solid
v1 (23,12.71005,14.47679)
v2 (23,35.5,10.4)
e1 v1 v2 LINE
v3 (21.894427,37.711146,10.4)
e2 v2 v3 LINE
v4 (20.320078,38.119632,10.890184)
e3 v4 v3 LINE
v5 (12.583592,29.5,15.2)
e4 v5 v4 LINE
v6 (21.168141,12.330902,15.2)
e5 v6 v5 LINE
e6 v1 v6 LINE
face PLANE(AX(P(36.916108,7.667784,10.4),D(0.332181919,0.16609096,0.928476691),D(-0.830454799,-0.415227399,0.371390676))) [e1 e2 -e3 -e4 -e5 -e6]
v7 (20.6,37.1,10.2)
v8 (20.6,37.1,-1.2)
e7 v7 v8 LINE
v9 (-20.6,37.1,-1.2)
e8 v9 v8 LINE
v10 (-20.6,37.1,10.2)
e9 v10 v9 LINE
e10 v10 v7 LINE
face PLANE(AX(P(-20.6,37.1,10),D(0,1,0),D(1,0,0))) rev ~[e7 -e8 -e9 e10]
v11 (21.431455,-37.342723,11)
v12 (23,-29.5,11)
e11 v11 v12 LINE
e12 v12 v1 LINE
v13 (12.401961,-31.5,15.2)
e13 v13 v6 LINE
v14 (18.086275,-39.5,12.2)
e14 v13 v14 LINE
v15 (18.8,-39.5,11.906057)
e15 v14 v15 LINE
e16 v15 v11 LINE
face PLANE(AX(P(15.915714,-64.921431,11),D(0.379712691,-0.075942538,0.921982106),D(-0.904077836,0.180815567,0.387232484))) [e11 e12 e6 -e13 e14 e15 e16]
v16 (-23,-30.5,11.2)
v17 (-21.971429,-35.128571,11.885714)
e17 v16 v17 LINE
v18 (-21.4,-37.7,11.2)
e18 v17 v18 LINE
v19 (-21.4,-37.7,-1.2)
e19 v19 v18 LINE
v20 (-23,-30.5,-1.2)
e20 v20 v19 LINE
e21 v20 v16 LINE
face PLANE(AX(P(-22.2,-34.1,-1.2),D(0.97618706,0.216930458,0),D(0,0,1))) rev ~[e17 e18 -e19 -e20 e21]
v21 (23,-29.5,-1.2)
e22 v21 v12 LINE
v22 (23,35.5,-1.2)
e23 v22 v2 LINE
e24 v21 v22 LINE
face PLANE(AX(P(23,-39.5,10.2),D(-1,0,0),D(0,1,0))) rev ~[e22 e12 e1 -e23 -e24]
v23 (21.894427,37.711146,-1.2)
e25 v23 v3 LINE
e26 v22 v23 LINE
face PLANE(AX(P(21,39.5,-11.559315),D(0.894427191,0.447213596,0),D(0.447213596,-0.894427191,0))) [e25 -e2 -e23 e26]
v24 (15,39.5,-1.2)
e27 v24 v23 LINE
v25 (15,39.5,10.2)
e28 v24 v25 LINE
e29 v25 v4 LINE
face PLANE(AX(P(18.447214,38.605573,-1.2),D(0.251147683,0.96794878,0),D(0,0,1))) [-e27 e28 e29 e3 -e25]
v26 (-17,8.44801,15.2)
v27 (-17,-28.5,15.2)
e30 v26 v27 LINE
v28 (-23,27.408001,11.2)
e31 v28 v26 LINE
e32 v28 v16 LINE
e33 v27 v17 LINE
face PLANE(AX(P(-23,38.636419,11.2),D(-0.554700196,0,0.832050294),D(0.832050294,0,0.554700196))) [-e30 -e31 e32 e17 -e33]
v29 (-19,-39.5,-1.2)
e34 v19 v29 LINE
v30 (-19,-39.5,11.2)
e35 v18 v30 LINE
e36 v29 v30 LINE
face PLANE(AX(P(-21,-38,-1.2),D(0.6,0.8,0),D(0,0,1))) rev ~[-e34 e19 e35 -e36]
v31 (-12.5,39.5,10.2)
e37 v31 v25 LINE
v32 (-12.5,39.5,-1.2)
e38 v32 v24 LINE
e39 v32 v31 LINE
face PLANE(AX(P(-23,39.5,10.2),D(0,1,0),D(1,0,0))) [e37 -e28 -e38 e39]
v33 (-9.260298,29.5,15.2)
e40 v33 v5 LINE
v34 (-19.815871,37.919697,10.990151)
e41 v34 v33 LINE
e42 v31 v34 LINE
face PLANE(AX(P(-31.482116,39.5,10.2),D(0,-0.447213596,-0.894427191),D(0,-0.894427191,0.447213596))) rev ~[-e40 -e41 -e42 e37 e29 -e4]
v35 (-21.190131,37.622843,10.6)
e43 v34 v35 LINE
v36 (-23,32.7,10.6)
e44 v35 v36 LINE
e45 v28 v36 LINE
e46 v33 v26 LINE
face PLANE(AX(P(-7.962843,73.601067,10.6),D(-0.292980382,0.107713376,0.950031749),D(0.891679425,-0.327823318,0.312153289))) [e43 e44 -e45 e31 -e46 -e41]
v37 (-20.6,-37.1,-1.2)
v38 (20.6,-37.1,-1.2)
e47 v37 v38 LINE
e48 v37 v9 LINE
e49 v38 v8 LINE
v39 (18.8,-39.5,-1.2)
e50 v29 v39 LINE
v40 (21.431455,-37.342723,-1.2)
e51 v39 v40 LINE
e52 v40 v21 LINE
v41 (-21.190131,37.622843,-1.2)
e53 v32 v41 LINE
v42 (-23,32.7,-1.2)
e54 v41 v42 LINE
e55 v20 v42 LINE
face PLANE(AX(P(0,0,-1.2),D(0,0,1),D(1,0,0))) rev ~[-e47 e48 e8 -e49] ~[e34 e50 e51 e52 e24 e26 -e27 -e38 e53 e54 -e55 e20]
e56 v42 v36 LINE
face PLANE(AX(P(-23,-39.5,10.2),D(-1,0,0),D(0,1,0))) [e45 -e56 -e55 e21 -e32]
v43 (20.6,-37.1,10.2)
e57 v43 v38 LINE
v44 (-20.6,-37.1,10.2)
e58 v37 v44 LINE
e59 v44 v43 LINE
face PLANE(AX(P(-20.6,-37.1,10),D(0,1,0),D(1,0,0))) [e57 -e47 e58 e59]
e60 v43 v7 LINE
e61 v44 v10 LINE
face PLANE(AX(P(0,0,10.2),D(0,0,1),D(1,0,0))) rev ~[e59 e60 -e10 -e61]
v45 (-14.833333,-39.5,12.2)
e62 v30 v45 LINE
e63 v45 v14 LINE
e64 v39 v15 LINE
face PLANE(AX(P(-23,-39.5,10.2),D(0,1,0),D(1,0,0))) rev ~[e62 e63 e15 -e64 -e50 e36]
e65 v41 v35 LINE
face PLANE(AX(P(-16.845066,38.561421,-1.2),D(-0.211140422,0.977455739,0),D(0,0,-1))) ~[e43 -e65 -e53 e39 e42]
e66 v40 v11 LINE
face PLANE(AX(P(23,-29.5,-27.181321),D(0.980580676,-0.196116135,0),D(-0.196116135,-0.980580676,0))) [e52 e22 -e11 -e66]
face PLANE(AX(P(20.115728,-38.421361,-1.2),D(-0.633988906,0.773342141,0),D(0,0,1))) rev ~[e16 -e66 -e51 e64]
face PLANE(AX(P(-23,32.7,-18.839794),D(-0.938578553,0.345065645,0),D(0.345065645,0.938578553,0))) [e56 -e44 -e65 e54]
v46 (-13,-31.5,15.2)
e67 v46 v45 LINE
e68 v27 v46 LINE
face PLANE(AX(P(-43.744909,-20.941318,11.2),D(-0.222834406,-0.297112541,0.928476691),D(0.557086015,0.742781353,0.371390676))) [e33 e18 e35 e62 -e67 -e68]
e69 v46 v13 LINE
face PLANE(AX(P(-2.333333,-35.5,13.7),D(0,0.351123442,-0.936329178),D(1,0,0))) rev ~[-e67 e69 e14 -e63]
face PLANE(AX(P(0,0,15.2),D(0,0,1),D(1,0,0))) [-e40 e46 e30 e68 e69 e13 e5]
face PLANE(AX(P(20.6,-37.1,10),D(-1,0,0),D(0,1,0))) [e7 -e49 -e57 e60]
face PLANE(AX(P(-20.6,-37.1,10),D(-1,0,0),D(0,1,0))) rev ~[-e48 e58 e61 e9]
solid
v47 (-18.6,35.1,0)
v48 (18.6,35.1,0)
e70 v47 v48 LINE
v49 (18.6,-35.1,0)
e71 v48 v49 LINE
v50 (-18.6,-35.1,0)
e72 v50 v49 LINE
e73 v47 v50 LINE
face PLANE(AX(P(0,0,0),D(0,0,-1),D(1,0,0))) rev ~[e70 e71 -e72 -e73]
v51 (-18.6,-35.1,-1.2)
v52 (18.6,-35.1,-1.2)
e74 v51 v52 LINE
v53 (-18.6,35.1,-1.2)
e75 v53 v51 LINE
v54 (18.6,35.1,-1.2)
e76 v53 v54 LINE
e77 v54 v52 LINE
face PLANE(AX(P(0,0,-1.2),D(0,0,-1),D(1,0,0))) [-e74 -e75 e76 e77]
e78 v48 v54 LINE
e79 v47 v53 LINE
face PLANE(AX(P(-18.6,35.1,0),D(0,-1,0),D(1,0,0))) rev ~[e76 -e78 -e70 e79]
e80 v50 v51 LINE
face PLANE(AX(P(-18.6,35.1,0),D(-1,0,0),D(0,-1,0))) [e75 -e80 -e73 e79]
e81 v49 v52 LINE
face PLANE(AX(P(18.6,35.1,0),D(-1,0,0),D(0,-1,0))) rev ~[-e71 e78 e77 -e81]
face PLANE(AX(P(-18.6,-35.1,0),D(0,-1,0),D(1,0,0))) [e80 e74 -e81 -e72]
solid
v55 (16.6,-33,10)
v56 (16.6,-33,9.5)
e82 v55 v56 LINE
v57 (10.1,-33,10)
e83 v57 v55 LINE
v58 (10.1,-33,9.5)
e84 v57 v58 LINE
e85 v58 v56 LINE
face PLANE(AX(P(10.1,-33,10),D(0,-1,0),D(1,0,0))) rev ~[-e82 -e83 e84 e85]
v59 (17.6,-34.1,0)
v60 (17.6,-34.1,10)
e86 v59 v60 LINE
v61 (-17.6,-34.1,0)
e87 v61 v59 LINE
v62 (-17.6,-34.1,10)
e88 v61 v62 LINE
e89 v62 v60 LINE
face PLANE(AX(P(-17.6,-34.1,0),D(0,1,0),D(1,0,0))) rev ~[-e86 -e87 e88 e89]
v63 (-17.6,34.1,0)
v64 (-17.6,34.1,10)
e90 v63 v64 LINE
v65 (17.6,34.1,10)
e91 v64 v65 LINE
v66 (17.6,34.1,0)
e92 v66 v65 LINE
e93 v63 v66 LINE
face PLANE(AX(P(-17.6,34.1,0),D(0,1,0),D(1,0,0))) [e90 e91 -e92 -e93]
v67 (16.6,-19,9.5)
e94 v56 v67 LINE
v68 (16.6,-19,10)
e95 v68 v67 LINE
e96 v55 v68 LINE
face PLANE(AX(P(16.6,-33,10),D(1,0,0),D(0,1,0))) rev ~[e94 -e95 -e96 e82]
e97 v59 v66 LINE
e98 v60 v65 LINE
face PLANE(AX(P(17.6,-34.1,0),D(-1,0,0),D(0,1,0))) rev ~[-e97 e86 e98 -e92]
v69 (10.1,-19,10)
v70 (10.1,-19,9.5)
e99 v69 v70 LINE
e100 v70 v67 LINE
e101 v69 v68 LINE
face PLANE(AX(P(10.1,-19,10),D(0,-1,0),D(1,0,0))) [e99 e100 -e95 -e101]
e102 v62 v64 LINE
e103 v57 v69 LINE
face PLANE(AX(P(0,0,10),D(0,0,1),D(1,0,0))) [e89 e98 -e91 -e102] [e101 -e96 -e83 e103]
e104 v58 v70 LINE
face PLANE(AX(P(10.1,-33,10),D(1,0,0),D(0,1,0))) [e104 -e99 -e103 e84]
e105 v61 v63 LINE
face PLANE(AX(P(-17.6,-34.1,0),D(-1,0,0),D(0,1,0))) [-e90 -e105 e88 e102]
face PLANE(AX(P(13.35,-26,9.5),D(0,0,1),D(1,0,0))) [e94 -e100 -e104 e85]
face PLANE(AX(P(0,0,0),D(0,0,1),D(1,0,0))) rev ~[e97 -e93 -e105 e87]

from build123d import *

# Parameters (mm, degrees)
F0_W          = 35.2
F0_H          = 68.2
F1_DEPTH      = 10
F2_W          = 6.5
F2_H          = 14
F3_DEPTH      = 0.5
F4_W          = 37.2
F4_H          = 70.2
F5_DEPTH      = 1.2
F6_W          = 46
F6_H          = 79
F6_W_2        = 41.2
F6_H_2        = 74.2
F7_DEPTH      = 11.2
F7_DEPTH_BACK = 0.2
F8_W          = 46
F8_H          = 79
F9_DEPTH      = 5
F10_T1_DEPTH  = 68.3626417259
F11_SIZE2     = 4
F11_SIZE      = 3
F12_T1_DEPTH  = 51.679588215
F13_T1_DEPTH  = 37.1186309903
F14_T1_DEPTH  = 105.3432147832
F15_T1_DEPTH  = 56.8622727826
F16_T1_DEPTH  = 113.8975360582
F17_T1_DEPTH  = 66.7068632941
F18_T1_DEPTH  = 64.9639966922
F19_T1_DEPTH  = 78.1392222347
F20_SIZE2     = 3
F20_SIZE      = 8
F21_SIZE      = 2.2
F22_SIZE2     = 2
F22_SIZE      = 8
F23_SIZE2     = 2
F23_SIZE      = 6
F24_SIZE2     = 2
F24_SIZE      = 6


# Not quite as in the source:
# - a fillet or chamfer that OpenCascade refuses, or shapes differently, is made with other operations: its cross-section is extruded or revolved along the edge and cut away or added


with BuildPart() as f1:
    # F0 (on Top) → F1 (new body)
    with BuildSketch(Plane.XY):
        Rectangle(F0_W, F0_H)
    extrude(amount=F1_DEPTH)

    # F2 (on face) → F3 (cut)
    with BuildSketch(Plane.XY.offset(10)):
        with Locations((13.35, -26)):
            Rectangle(F2_W, F2_H)
    extrude(amount=-F3_DEPTH, mode=Mode.SUBTRACT)


with BuildPart() as f5:
    # F4 (on face) → F5 (new body)
    with BuildSketch(Plane(origin=(0, 0, 0), x_dir=(1, 0, 0), z_dir=(0, 0, -1))):
        Rectangle(F4_W, F4_H)
    extrude(amount=F5_DEPTH)


with BuildPart() as f7:
    # F6 (on face) → F7 (new body, two sides)
    with BuildSketch(Plane.XY.offset(10)) as f7_sk:
        Rectangle(F6_W, F6_H)
        Rectangle(F6_W_2, F6_H_2, mode=Mode.SUBTRACT)
    extrude(amount=-F7_DEPTH)
    extrude(f7_sk.sketch, amount=F7_DEPTH_BACK)

    # F8 (on face) → F9 (join)
    with BuildSketch(Plane.XY.offset(10.2)):
        Rectangle(F8_W, F8_H)
    extrude(amount=F9_DEPTH)

    # F10: chamfer of 2 x 10 on 1 edges, made by hand

    # F10_s2 → F10_t1 (cut)
    with BuildSketch(Plane.XY.offset(-27.181320863)):
        Polygon((23, -29.5), (21, -39.5), (23, -39.5), align=None)
    extrude(amount=F10_T1_DEPTH, mode=Mode.SUBTRACT)

    # F11
    f11_edges = [f7.edges().sort_by_distance(p)[0] for p in [
        (-23, -39.5, 7),
    ]]
    chamfer(f11_edges, length=F11_SIZE, length2=F11_SIZE2)

    # F12: chamfer of 2.5 x 6.8 on 1 edges, made by hand

    # F12_s2 → F12_t1 (cut)
    with BuildSketch(Plane.XY.offset(-18.8397941075)):
        Polygon((-23, 32.7), (-20.5, 39.5), (-23, 39.5), align=None)
    extrude(amount=F12_T1_DEPTH, mode=Mode.SUBTRACT)

    # F13: chamfer of 4 x 2 on 1 edges, made by hand

    # F13_s2 → F13_t1 (cut)
    with BuildSketch(Plane.XY.offset(-11.5593154951)):
        Polygon((21, 39.5), (23, 35.5), (23, 39.5), align=None)
    extrude(amount=F13_T1_DEPTH, mode=Mode.SUBTRACT)

    # F14: chamfer of 14 x 4.6 on 1 edges, made by hand

    # F14_s2 → F14_t1 (cut)
    with BuildSketch(Plane(origin=(22.8891289585, 62.258430767, 0), x_dir=(0, 0, 1), z_dir=(-0.3450656446, -0.9385785534, 0))):
        Polygon((10.6, 32.8709533075), (15.2, 18.8709533075), (15.2, 32.8709533075), align=None)
    extrude(amount=F14_T1_DEPTH, mode=Mode.SUBTRACT)

    # F15: chamfer of 10 x 4 on 1 edges, made by hand

    # F15_s2 → F15_t1 (cut)
    with BuildSketch(Plane(origin=(-17.944909113, 13.4586818348, 0), x_dir=(0, 0, 1), z_dir=(0.8, -0.6, 0))):
        Polygon((11.2, 43), (15.2, 33), (15.2, 43), align=None)
    extrude(amount=F15_T1_DEPTH, mode=Mode.SUBTRACT)

    # F16: chamfer of 10 x 4.2 on 1 edges, made by hand

    # F16_s2 → F16_t1 (cut)
    with BuildSketch(Plane(origin=(-11.8727476818, -59.3637384092, 0), x_dir=(0, 0, 1), z_dir=(0.1961161351, 0.9805806757, 0))):
        Polygon((11, 28.3387815275), (15.2, 18.3387815275), (15.2, 28.3387815275), align=None)
    extrude(amount=F16_T1_DEPTH, mode=Mode.SUBTRACT)

    # F17: chamfer of 12 x 4.8 on 1 edges, made by hand

    # F17_s2 → F17_t1 (cut)
    with BuildSketch(Plane(origin=(4.3161080891, -8.6322161783, 0), x_dir=(0, 0, 1), z_dir=(-0.4472135955, 0.894427191, 0))):
        Polygon((10.4, 36.4479080332), (15.2, 24.4479080332), (15.2, 36.4479080332), align=None)
    extrude(amount=F17_T1_DEPTH, mode=Mode.SUBTRACT)

    # F18: chamfer of 5 x 10 on 1 edges, made by hand

    # F18_s2 → F18_t1 (cut)
    with BuildSketch(Plane.YZ.offset(-31.4821158194)):
        Polygon((39.5, 10.2), (29.5, 15.2), (39.5, 15.2), align=None)
    extrude(amount=F18_T1_DEPTH, mode=Mode.SUBTRACT)

    # F19: chamfer of 4 x 6 on 1 edges, made by hand

    # F19_s2 → F19_t1 (cut)
    with BuildSketch(Plane.XZ.offset(-38.6364190914)):
        Polygon((-23, 11.2), (-17, 15.2), (-23, 15.2), align=None)
    extrude(amount=F19_T1_DEPTH, mode=Mode.SUBTRACT)

    # F20
    f20_edges = [f7.edges().sort_by_distance(p)[0] for p in [
        (4.234314, -39.5, 15.2),
    ]]
    f20_side = f7.faces().sort_by_distance((0.719932, -3.706312, 15.2))[0]
    chamfer(f20_edges, length=F20_SIZE, length2=F20_SIZE2, reference=f20_side)

    # F21
    f21_edges = [f7.edges().sort_by_distance(p)[0] for p in [
        (21, -39.5, 4.9),
    ]]
    chamfer(f21_edges, length=F21_SIZE)

    # F22
    f22_edges = [f7.edges().sort_by_distance(p)[0] for p in [
        (-20.5, 39.5, 4.5),
    ]]
    chamfer(f22_edges, length=F22_SIZE, length2=F22_SIZE2)

    # F23
    f23_edges = [f7.edges().sort_by_distance(p)[0] for p in [
        (21, 39.5, 4.5),
    ]]
    chamfer(f23_edges, length=F23_SIZE, length2=F23_SIZE2)

    # F24
    f24_edges = [f7.edges().sort_by_distance(p)[0] for p in [
        (-23, -36.5, 5),
    ]]
    chamfer(f24_edges, length=F24_SIZE, length2=F24_SIZE2)


solid = Compound([f1.part, f5.part, f7.part])
